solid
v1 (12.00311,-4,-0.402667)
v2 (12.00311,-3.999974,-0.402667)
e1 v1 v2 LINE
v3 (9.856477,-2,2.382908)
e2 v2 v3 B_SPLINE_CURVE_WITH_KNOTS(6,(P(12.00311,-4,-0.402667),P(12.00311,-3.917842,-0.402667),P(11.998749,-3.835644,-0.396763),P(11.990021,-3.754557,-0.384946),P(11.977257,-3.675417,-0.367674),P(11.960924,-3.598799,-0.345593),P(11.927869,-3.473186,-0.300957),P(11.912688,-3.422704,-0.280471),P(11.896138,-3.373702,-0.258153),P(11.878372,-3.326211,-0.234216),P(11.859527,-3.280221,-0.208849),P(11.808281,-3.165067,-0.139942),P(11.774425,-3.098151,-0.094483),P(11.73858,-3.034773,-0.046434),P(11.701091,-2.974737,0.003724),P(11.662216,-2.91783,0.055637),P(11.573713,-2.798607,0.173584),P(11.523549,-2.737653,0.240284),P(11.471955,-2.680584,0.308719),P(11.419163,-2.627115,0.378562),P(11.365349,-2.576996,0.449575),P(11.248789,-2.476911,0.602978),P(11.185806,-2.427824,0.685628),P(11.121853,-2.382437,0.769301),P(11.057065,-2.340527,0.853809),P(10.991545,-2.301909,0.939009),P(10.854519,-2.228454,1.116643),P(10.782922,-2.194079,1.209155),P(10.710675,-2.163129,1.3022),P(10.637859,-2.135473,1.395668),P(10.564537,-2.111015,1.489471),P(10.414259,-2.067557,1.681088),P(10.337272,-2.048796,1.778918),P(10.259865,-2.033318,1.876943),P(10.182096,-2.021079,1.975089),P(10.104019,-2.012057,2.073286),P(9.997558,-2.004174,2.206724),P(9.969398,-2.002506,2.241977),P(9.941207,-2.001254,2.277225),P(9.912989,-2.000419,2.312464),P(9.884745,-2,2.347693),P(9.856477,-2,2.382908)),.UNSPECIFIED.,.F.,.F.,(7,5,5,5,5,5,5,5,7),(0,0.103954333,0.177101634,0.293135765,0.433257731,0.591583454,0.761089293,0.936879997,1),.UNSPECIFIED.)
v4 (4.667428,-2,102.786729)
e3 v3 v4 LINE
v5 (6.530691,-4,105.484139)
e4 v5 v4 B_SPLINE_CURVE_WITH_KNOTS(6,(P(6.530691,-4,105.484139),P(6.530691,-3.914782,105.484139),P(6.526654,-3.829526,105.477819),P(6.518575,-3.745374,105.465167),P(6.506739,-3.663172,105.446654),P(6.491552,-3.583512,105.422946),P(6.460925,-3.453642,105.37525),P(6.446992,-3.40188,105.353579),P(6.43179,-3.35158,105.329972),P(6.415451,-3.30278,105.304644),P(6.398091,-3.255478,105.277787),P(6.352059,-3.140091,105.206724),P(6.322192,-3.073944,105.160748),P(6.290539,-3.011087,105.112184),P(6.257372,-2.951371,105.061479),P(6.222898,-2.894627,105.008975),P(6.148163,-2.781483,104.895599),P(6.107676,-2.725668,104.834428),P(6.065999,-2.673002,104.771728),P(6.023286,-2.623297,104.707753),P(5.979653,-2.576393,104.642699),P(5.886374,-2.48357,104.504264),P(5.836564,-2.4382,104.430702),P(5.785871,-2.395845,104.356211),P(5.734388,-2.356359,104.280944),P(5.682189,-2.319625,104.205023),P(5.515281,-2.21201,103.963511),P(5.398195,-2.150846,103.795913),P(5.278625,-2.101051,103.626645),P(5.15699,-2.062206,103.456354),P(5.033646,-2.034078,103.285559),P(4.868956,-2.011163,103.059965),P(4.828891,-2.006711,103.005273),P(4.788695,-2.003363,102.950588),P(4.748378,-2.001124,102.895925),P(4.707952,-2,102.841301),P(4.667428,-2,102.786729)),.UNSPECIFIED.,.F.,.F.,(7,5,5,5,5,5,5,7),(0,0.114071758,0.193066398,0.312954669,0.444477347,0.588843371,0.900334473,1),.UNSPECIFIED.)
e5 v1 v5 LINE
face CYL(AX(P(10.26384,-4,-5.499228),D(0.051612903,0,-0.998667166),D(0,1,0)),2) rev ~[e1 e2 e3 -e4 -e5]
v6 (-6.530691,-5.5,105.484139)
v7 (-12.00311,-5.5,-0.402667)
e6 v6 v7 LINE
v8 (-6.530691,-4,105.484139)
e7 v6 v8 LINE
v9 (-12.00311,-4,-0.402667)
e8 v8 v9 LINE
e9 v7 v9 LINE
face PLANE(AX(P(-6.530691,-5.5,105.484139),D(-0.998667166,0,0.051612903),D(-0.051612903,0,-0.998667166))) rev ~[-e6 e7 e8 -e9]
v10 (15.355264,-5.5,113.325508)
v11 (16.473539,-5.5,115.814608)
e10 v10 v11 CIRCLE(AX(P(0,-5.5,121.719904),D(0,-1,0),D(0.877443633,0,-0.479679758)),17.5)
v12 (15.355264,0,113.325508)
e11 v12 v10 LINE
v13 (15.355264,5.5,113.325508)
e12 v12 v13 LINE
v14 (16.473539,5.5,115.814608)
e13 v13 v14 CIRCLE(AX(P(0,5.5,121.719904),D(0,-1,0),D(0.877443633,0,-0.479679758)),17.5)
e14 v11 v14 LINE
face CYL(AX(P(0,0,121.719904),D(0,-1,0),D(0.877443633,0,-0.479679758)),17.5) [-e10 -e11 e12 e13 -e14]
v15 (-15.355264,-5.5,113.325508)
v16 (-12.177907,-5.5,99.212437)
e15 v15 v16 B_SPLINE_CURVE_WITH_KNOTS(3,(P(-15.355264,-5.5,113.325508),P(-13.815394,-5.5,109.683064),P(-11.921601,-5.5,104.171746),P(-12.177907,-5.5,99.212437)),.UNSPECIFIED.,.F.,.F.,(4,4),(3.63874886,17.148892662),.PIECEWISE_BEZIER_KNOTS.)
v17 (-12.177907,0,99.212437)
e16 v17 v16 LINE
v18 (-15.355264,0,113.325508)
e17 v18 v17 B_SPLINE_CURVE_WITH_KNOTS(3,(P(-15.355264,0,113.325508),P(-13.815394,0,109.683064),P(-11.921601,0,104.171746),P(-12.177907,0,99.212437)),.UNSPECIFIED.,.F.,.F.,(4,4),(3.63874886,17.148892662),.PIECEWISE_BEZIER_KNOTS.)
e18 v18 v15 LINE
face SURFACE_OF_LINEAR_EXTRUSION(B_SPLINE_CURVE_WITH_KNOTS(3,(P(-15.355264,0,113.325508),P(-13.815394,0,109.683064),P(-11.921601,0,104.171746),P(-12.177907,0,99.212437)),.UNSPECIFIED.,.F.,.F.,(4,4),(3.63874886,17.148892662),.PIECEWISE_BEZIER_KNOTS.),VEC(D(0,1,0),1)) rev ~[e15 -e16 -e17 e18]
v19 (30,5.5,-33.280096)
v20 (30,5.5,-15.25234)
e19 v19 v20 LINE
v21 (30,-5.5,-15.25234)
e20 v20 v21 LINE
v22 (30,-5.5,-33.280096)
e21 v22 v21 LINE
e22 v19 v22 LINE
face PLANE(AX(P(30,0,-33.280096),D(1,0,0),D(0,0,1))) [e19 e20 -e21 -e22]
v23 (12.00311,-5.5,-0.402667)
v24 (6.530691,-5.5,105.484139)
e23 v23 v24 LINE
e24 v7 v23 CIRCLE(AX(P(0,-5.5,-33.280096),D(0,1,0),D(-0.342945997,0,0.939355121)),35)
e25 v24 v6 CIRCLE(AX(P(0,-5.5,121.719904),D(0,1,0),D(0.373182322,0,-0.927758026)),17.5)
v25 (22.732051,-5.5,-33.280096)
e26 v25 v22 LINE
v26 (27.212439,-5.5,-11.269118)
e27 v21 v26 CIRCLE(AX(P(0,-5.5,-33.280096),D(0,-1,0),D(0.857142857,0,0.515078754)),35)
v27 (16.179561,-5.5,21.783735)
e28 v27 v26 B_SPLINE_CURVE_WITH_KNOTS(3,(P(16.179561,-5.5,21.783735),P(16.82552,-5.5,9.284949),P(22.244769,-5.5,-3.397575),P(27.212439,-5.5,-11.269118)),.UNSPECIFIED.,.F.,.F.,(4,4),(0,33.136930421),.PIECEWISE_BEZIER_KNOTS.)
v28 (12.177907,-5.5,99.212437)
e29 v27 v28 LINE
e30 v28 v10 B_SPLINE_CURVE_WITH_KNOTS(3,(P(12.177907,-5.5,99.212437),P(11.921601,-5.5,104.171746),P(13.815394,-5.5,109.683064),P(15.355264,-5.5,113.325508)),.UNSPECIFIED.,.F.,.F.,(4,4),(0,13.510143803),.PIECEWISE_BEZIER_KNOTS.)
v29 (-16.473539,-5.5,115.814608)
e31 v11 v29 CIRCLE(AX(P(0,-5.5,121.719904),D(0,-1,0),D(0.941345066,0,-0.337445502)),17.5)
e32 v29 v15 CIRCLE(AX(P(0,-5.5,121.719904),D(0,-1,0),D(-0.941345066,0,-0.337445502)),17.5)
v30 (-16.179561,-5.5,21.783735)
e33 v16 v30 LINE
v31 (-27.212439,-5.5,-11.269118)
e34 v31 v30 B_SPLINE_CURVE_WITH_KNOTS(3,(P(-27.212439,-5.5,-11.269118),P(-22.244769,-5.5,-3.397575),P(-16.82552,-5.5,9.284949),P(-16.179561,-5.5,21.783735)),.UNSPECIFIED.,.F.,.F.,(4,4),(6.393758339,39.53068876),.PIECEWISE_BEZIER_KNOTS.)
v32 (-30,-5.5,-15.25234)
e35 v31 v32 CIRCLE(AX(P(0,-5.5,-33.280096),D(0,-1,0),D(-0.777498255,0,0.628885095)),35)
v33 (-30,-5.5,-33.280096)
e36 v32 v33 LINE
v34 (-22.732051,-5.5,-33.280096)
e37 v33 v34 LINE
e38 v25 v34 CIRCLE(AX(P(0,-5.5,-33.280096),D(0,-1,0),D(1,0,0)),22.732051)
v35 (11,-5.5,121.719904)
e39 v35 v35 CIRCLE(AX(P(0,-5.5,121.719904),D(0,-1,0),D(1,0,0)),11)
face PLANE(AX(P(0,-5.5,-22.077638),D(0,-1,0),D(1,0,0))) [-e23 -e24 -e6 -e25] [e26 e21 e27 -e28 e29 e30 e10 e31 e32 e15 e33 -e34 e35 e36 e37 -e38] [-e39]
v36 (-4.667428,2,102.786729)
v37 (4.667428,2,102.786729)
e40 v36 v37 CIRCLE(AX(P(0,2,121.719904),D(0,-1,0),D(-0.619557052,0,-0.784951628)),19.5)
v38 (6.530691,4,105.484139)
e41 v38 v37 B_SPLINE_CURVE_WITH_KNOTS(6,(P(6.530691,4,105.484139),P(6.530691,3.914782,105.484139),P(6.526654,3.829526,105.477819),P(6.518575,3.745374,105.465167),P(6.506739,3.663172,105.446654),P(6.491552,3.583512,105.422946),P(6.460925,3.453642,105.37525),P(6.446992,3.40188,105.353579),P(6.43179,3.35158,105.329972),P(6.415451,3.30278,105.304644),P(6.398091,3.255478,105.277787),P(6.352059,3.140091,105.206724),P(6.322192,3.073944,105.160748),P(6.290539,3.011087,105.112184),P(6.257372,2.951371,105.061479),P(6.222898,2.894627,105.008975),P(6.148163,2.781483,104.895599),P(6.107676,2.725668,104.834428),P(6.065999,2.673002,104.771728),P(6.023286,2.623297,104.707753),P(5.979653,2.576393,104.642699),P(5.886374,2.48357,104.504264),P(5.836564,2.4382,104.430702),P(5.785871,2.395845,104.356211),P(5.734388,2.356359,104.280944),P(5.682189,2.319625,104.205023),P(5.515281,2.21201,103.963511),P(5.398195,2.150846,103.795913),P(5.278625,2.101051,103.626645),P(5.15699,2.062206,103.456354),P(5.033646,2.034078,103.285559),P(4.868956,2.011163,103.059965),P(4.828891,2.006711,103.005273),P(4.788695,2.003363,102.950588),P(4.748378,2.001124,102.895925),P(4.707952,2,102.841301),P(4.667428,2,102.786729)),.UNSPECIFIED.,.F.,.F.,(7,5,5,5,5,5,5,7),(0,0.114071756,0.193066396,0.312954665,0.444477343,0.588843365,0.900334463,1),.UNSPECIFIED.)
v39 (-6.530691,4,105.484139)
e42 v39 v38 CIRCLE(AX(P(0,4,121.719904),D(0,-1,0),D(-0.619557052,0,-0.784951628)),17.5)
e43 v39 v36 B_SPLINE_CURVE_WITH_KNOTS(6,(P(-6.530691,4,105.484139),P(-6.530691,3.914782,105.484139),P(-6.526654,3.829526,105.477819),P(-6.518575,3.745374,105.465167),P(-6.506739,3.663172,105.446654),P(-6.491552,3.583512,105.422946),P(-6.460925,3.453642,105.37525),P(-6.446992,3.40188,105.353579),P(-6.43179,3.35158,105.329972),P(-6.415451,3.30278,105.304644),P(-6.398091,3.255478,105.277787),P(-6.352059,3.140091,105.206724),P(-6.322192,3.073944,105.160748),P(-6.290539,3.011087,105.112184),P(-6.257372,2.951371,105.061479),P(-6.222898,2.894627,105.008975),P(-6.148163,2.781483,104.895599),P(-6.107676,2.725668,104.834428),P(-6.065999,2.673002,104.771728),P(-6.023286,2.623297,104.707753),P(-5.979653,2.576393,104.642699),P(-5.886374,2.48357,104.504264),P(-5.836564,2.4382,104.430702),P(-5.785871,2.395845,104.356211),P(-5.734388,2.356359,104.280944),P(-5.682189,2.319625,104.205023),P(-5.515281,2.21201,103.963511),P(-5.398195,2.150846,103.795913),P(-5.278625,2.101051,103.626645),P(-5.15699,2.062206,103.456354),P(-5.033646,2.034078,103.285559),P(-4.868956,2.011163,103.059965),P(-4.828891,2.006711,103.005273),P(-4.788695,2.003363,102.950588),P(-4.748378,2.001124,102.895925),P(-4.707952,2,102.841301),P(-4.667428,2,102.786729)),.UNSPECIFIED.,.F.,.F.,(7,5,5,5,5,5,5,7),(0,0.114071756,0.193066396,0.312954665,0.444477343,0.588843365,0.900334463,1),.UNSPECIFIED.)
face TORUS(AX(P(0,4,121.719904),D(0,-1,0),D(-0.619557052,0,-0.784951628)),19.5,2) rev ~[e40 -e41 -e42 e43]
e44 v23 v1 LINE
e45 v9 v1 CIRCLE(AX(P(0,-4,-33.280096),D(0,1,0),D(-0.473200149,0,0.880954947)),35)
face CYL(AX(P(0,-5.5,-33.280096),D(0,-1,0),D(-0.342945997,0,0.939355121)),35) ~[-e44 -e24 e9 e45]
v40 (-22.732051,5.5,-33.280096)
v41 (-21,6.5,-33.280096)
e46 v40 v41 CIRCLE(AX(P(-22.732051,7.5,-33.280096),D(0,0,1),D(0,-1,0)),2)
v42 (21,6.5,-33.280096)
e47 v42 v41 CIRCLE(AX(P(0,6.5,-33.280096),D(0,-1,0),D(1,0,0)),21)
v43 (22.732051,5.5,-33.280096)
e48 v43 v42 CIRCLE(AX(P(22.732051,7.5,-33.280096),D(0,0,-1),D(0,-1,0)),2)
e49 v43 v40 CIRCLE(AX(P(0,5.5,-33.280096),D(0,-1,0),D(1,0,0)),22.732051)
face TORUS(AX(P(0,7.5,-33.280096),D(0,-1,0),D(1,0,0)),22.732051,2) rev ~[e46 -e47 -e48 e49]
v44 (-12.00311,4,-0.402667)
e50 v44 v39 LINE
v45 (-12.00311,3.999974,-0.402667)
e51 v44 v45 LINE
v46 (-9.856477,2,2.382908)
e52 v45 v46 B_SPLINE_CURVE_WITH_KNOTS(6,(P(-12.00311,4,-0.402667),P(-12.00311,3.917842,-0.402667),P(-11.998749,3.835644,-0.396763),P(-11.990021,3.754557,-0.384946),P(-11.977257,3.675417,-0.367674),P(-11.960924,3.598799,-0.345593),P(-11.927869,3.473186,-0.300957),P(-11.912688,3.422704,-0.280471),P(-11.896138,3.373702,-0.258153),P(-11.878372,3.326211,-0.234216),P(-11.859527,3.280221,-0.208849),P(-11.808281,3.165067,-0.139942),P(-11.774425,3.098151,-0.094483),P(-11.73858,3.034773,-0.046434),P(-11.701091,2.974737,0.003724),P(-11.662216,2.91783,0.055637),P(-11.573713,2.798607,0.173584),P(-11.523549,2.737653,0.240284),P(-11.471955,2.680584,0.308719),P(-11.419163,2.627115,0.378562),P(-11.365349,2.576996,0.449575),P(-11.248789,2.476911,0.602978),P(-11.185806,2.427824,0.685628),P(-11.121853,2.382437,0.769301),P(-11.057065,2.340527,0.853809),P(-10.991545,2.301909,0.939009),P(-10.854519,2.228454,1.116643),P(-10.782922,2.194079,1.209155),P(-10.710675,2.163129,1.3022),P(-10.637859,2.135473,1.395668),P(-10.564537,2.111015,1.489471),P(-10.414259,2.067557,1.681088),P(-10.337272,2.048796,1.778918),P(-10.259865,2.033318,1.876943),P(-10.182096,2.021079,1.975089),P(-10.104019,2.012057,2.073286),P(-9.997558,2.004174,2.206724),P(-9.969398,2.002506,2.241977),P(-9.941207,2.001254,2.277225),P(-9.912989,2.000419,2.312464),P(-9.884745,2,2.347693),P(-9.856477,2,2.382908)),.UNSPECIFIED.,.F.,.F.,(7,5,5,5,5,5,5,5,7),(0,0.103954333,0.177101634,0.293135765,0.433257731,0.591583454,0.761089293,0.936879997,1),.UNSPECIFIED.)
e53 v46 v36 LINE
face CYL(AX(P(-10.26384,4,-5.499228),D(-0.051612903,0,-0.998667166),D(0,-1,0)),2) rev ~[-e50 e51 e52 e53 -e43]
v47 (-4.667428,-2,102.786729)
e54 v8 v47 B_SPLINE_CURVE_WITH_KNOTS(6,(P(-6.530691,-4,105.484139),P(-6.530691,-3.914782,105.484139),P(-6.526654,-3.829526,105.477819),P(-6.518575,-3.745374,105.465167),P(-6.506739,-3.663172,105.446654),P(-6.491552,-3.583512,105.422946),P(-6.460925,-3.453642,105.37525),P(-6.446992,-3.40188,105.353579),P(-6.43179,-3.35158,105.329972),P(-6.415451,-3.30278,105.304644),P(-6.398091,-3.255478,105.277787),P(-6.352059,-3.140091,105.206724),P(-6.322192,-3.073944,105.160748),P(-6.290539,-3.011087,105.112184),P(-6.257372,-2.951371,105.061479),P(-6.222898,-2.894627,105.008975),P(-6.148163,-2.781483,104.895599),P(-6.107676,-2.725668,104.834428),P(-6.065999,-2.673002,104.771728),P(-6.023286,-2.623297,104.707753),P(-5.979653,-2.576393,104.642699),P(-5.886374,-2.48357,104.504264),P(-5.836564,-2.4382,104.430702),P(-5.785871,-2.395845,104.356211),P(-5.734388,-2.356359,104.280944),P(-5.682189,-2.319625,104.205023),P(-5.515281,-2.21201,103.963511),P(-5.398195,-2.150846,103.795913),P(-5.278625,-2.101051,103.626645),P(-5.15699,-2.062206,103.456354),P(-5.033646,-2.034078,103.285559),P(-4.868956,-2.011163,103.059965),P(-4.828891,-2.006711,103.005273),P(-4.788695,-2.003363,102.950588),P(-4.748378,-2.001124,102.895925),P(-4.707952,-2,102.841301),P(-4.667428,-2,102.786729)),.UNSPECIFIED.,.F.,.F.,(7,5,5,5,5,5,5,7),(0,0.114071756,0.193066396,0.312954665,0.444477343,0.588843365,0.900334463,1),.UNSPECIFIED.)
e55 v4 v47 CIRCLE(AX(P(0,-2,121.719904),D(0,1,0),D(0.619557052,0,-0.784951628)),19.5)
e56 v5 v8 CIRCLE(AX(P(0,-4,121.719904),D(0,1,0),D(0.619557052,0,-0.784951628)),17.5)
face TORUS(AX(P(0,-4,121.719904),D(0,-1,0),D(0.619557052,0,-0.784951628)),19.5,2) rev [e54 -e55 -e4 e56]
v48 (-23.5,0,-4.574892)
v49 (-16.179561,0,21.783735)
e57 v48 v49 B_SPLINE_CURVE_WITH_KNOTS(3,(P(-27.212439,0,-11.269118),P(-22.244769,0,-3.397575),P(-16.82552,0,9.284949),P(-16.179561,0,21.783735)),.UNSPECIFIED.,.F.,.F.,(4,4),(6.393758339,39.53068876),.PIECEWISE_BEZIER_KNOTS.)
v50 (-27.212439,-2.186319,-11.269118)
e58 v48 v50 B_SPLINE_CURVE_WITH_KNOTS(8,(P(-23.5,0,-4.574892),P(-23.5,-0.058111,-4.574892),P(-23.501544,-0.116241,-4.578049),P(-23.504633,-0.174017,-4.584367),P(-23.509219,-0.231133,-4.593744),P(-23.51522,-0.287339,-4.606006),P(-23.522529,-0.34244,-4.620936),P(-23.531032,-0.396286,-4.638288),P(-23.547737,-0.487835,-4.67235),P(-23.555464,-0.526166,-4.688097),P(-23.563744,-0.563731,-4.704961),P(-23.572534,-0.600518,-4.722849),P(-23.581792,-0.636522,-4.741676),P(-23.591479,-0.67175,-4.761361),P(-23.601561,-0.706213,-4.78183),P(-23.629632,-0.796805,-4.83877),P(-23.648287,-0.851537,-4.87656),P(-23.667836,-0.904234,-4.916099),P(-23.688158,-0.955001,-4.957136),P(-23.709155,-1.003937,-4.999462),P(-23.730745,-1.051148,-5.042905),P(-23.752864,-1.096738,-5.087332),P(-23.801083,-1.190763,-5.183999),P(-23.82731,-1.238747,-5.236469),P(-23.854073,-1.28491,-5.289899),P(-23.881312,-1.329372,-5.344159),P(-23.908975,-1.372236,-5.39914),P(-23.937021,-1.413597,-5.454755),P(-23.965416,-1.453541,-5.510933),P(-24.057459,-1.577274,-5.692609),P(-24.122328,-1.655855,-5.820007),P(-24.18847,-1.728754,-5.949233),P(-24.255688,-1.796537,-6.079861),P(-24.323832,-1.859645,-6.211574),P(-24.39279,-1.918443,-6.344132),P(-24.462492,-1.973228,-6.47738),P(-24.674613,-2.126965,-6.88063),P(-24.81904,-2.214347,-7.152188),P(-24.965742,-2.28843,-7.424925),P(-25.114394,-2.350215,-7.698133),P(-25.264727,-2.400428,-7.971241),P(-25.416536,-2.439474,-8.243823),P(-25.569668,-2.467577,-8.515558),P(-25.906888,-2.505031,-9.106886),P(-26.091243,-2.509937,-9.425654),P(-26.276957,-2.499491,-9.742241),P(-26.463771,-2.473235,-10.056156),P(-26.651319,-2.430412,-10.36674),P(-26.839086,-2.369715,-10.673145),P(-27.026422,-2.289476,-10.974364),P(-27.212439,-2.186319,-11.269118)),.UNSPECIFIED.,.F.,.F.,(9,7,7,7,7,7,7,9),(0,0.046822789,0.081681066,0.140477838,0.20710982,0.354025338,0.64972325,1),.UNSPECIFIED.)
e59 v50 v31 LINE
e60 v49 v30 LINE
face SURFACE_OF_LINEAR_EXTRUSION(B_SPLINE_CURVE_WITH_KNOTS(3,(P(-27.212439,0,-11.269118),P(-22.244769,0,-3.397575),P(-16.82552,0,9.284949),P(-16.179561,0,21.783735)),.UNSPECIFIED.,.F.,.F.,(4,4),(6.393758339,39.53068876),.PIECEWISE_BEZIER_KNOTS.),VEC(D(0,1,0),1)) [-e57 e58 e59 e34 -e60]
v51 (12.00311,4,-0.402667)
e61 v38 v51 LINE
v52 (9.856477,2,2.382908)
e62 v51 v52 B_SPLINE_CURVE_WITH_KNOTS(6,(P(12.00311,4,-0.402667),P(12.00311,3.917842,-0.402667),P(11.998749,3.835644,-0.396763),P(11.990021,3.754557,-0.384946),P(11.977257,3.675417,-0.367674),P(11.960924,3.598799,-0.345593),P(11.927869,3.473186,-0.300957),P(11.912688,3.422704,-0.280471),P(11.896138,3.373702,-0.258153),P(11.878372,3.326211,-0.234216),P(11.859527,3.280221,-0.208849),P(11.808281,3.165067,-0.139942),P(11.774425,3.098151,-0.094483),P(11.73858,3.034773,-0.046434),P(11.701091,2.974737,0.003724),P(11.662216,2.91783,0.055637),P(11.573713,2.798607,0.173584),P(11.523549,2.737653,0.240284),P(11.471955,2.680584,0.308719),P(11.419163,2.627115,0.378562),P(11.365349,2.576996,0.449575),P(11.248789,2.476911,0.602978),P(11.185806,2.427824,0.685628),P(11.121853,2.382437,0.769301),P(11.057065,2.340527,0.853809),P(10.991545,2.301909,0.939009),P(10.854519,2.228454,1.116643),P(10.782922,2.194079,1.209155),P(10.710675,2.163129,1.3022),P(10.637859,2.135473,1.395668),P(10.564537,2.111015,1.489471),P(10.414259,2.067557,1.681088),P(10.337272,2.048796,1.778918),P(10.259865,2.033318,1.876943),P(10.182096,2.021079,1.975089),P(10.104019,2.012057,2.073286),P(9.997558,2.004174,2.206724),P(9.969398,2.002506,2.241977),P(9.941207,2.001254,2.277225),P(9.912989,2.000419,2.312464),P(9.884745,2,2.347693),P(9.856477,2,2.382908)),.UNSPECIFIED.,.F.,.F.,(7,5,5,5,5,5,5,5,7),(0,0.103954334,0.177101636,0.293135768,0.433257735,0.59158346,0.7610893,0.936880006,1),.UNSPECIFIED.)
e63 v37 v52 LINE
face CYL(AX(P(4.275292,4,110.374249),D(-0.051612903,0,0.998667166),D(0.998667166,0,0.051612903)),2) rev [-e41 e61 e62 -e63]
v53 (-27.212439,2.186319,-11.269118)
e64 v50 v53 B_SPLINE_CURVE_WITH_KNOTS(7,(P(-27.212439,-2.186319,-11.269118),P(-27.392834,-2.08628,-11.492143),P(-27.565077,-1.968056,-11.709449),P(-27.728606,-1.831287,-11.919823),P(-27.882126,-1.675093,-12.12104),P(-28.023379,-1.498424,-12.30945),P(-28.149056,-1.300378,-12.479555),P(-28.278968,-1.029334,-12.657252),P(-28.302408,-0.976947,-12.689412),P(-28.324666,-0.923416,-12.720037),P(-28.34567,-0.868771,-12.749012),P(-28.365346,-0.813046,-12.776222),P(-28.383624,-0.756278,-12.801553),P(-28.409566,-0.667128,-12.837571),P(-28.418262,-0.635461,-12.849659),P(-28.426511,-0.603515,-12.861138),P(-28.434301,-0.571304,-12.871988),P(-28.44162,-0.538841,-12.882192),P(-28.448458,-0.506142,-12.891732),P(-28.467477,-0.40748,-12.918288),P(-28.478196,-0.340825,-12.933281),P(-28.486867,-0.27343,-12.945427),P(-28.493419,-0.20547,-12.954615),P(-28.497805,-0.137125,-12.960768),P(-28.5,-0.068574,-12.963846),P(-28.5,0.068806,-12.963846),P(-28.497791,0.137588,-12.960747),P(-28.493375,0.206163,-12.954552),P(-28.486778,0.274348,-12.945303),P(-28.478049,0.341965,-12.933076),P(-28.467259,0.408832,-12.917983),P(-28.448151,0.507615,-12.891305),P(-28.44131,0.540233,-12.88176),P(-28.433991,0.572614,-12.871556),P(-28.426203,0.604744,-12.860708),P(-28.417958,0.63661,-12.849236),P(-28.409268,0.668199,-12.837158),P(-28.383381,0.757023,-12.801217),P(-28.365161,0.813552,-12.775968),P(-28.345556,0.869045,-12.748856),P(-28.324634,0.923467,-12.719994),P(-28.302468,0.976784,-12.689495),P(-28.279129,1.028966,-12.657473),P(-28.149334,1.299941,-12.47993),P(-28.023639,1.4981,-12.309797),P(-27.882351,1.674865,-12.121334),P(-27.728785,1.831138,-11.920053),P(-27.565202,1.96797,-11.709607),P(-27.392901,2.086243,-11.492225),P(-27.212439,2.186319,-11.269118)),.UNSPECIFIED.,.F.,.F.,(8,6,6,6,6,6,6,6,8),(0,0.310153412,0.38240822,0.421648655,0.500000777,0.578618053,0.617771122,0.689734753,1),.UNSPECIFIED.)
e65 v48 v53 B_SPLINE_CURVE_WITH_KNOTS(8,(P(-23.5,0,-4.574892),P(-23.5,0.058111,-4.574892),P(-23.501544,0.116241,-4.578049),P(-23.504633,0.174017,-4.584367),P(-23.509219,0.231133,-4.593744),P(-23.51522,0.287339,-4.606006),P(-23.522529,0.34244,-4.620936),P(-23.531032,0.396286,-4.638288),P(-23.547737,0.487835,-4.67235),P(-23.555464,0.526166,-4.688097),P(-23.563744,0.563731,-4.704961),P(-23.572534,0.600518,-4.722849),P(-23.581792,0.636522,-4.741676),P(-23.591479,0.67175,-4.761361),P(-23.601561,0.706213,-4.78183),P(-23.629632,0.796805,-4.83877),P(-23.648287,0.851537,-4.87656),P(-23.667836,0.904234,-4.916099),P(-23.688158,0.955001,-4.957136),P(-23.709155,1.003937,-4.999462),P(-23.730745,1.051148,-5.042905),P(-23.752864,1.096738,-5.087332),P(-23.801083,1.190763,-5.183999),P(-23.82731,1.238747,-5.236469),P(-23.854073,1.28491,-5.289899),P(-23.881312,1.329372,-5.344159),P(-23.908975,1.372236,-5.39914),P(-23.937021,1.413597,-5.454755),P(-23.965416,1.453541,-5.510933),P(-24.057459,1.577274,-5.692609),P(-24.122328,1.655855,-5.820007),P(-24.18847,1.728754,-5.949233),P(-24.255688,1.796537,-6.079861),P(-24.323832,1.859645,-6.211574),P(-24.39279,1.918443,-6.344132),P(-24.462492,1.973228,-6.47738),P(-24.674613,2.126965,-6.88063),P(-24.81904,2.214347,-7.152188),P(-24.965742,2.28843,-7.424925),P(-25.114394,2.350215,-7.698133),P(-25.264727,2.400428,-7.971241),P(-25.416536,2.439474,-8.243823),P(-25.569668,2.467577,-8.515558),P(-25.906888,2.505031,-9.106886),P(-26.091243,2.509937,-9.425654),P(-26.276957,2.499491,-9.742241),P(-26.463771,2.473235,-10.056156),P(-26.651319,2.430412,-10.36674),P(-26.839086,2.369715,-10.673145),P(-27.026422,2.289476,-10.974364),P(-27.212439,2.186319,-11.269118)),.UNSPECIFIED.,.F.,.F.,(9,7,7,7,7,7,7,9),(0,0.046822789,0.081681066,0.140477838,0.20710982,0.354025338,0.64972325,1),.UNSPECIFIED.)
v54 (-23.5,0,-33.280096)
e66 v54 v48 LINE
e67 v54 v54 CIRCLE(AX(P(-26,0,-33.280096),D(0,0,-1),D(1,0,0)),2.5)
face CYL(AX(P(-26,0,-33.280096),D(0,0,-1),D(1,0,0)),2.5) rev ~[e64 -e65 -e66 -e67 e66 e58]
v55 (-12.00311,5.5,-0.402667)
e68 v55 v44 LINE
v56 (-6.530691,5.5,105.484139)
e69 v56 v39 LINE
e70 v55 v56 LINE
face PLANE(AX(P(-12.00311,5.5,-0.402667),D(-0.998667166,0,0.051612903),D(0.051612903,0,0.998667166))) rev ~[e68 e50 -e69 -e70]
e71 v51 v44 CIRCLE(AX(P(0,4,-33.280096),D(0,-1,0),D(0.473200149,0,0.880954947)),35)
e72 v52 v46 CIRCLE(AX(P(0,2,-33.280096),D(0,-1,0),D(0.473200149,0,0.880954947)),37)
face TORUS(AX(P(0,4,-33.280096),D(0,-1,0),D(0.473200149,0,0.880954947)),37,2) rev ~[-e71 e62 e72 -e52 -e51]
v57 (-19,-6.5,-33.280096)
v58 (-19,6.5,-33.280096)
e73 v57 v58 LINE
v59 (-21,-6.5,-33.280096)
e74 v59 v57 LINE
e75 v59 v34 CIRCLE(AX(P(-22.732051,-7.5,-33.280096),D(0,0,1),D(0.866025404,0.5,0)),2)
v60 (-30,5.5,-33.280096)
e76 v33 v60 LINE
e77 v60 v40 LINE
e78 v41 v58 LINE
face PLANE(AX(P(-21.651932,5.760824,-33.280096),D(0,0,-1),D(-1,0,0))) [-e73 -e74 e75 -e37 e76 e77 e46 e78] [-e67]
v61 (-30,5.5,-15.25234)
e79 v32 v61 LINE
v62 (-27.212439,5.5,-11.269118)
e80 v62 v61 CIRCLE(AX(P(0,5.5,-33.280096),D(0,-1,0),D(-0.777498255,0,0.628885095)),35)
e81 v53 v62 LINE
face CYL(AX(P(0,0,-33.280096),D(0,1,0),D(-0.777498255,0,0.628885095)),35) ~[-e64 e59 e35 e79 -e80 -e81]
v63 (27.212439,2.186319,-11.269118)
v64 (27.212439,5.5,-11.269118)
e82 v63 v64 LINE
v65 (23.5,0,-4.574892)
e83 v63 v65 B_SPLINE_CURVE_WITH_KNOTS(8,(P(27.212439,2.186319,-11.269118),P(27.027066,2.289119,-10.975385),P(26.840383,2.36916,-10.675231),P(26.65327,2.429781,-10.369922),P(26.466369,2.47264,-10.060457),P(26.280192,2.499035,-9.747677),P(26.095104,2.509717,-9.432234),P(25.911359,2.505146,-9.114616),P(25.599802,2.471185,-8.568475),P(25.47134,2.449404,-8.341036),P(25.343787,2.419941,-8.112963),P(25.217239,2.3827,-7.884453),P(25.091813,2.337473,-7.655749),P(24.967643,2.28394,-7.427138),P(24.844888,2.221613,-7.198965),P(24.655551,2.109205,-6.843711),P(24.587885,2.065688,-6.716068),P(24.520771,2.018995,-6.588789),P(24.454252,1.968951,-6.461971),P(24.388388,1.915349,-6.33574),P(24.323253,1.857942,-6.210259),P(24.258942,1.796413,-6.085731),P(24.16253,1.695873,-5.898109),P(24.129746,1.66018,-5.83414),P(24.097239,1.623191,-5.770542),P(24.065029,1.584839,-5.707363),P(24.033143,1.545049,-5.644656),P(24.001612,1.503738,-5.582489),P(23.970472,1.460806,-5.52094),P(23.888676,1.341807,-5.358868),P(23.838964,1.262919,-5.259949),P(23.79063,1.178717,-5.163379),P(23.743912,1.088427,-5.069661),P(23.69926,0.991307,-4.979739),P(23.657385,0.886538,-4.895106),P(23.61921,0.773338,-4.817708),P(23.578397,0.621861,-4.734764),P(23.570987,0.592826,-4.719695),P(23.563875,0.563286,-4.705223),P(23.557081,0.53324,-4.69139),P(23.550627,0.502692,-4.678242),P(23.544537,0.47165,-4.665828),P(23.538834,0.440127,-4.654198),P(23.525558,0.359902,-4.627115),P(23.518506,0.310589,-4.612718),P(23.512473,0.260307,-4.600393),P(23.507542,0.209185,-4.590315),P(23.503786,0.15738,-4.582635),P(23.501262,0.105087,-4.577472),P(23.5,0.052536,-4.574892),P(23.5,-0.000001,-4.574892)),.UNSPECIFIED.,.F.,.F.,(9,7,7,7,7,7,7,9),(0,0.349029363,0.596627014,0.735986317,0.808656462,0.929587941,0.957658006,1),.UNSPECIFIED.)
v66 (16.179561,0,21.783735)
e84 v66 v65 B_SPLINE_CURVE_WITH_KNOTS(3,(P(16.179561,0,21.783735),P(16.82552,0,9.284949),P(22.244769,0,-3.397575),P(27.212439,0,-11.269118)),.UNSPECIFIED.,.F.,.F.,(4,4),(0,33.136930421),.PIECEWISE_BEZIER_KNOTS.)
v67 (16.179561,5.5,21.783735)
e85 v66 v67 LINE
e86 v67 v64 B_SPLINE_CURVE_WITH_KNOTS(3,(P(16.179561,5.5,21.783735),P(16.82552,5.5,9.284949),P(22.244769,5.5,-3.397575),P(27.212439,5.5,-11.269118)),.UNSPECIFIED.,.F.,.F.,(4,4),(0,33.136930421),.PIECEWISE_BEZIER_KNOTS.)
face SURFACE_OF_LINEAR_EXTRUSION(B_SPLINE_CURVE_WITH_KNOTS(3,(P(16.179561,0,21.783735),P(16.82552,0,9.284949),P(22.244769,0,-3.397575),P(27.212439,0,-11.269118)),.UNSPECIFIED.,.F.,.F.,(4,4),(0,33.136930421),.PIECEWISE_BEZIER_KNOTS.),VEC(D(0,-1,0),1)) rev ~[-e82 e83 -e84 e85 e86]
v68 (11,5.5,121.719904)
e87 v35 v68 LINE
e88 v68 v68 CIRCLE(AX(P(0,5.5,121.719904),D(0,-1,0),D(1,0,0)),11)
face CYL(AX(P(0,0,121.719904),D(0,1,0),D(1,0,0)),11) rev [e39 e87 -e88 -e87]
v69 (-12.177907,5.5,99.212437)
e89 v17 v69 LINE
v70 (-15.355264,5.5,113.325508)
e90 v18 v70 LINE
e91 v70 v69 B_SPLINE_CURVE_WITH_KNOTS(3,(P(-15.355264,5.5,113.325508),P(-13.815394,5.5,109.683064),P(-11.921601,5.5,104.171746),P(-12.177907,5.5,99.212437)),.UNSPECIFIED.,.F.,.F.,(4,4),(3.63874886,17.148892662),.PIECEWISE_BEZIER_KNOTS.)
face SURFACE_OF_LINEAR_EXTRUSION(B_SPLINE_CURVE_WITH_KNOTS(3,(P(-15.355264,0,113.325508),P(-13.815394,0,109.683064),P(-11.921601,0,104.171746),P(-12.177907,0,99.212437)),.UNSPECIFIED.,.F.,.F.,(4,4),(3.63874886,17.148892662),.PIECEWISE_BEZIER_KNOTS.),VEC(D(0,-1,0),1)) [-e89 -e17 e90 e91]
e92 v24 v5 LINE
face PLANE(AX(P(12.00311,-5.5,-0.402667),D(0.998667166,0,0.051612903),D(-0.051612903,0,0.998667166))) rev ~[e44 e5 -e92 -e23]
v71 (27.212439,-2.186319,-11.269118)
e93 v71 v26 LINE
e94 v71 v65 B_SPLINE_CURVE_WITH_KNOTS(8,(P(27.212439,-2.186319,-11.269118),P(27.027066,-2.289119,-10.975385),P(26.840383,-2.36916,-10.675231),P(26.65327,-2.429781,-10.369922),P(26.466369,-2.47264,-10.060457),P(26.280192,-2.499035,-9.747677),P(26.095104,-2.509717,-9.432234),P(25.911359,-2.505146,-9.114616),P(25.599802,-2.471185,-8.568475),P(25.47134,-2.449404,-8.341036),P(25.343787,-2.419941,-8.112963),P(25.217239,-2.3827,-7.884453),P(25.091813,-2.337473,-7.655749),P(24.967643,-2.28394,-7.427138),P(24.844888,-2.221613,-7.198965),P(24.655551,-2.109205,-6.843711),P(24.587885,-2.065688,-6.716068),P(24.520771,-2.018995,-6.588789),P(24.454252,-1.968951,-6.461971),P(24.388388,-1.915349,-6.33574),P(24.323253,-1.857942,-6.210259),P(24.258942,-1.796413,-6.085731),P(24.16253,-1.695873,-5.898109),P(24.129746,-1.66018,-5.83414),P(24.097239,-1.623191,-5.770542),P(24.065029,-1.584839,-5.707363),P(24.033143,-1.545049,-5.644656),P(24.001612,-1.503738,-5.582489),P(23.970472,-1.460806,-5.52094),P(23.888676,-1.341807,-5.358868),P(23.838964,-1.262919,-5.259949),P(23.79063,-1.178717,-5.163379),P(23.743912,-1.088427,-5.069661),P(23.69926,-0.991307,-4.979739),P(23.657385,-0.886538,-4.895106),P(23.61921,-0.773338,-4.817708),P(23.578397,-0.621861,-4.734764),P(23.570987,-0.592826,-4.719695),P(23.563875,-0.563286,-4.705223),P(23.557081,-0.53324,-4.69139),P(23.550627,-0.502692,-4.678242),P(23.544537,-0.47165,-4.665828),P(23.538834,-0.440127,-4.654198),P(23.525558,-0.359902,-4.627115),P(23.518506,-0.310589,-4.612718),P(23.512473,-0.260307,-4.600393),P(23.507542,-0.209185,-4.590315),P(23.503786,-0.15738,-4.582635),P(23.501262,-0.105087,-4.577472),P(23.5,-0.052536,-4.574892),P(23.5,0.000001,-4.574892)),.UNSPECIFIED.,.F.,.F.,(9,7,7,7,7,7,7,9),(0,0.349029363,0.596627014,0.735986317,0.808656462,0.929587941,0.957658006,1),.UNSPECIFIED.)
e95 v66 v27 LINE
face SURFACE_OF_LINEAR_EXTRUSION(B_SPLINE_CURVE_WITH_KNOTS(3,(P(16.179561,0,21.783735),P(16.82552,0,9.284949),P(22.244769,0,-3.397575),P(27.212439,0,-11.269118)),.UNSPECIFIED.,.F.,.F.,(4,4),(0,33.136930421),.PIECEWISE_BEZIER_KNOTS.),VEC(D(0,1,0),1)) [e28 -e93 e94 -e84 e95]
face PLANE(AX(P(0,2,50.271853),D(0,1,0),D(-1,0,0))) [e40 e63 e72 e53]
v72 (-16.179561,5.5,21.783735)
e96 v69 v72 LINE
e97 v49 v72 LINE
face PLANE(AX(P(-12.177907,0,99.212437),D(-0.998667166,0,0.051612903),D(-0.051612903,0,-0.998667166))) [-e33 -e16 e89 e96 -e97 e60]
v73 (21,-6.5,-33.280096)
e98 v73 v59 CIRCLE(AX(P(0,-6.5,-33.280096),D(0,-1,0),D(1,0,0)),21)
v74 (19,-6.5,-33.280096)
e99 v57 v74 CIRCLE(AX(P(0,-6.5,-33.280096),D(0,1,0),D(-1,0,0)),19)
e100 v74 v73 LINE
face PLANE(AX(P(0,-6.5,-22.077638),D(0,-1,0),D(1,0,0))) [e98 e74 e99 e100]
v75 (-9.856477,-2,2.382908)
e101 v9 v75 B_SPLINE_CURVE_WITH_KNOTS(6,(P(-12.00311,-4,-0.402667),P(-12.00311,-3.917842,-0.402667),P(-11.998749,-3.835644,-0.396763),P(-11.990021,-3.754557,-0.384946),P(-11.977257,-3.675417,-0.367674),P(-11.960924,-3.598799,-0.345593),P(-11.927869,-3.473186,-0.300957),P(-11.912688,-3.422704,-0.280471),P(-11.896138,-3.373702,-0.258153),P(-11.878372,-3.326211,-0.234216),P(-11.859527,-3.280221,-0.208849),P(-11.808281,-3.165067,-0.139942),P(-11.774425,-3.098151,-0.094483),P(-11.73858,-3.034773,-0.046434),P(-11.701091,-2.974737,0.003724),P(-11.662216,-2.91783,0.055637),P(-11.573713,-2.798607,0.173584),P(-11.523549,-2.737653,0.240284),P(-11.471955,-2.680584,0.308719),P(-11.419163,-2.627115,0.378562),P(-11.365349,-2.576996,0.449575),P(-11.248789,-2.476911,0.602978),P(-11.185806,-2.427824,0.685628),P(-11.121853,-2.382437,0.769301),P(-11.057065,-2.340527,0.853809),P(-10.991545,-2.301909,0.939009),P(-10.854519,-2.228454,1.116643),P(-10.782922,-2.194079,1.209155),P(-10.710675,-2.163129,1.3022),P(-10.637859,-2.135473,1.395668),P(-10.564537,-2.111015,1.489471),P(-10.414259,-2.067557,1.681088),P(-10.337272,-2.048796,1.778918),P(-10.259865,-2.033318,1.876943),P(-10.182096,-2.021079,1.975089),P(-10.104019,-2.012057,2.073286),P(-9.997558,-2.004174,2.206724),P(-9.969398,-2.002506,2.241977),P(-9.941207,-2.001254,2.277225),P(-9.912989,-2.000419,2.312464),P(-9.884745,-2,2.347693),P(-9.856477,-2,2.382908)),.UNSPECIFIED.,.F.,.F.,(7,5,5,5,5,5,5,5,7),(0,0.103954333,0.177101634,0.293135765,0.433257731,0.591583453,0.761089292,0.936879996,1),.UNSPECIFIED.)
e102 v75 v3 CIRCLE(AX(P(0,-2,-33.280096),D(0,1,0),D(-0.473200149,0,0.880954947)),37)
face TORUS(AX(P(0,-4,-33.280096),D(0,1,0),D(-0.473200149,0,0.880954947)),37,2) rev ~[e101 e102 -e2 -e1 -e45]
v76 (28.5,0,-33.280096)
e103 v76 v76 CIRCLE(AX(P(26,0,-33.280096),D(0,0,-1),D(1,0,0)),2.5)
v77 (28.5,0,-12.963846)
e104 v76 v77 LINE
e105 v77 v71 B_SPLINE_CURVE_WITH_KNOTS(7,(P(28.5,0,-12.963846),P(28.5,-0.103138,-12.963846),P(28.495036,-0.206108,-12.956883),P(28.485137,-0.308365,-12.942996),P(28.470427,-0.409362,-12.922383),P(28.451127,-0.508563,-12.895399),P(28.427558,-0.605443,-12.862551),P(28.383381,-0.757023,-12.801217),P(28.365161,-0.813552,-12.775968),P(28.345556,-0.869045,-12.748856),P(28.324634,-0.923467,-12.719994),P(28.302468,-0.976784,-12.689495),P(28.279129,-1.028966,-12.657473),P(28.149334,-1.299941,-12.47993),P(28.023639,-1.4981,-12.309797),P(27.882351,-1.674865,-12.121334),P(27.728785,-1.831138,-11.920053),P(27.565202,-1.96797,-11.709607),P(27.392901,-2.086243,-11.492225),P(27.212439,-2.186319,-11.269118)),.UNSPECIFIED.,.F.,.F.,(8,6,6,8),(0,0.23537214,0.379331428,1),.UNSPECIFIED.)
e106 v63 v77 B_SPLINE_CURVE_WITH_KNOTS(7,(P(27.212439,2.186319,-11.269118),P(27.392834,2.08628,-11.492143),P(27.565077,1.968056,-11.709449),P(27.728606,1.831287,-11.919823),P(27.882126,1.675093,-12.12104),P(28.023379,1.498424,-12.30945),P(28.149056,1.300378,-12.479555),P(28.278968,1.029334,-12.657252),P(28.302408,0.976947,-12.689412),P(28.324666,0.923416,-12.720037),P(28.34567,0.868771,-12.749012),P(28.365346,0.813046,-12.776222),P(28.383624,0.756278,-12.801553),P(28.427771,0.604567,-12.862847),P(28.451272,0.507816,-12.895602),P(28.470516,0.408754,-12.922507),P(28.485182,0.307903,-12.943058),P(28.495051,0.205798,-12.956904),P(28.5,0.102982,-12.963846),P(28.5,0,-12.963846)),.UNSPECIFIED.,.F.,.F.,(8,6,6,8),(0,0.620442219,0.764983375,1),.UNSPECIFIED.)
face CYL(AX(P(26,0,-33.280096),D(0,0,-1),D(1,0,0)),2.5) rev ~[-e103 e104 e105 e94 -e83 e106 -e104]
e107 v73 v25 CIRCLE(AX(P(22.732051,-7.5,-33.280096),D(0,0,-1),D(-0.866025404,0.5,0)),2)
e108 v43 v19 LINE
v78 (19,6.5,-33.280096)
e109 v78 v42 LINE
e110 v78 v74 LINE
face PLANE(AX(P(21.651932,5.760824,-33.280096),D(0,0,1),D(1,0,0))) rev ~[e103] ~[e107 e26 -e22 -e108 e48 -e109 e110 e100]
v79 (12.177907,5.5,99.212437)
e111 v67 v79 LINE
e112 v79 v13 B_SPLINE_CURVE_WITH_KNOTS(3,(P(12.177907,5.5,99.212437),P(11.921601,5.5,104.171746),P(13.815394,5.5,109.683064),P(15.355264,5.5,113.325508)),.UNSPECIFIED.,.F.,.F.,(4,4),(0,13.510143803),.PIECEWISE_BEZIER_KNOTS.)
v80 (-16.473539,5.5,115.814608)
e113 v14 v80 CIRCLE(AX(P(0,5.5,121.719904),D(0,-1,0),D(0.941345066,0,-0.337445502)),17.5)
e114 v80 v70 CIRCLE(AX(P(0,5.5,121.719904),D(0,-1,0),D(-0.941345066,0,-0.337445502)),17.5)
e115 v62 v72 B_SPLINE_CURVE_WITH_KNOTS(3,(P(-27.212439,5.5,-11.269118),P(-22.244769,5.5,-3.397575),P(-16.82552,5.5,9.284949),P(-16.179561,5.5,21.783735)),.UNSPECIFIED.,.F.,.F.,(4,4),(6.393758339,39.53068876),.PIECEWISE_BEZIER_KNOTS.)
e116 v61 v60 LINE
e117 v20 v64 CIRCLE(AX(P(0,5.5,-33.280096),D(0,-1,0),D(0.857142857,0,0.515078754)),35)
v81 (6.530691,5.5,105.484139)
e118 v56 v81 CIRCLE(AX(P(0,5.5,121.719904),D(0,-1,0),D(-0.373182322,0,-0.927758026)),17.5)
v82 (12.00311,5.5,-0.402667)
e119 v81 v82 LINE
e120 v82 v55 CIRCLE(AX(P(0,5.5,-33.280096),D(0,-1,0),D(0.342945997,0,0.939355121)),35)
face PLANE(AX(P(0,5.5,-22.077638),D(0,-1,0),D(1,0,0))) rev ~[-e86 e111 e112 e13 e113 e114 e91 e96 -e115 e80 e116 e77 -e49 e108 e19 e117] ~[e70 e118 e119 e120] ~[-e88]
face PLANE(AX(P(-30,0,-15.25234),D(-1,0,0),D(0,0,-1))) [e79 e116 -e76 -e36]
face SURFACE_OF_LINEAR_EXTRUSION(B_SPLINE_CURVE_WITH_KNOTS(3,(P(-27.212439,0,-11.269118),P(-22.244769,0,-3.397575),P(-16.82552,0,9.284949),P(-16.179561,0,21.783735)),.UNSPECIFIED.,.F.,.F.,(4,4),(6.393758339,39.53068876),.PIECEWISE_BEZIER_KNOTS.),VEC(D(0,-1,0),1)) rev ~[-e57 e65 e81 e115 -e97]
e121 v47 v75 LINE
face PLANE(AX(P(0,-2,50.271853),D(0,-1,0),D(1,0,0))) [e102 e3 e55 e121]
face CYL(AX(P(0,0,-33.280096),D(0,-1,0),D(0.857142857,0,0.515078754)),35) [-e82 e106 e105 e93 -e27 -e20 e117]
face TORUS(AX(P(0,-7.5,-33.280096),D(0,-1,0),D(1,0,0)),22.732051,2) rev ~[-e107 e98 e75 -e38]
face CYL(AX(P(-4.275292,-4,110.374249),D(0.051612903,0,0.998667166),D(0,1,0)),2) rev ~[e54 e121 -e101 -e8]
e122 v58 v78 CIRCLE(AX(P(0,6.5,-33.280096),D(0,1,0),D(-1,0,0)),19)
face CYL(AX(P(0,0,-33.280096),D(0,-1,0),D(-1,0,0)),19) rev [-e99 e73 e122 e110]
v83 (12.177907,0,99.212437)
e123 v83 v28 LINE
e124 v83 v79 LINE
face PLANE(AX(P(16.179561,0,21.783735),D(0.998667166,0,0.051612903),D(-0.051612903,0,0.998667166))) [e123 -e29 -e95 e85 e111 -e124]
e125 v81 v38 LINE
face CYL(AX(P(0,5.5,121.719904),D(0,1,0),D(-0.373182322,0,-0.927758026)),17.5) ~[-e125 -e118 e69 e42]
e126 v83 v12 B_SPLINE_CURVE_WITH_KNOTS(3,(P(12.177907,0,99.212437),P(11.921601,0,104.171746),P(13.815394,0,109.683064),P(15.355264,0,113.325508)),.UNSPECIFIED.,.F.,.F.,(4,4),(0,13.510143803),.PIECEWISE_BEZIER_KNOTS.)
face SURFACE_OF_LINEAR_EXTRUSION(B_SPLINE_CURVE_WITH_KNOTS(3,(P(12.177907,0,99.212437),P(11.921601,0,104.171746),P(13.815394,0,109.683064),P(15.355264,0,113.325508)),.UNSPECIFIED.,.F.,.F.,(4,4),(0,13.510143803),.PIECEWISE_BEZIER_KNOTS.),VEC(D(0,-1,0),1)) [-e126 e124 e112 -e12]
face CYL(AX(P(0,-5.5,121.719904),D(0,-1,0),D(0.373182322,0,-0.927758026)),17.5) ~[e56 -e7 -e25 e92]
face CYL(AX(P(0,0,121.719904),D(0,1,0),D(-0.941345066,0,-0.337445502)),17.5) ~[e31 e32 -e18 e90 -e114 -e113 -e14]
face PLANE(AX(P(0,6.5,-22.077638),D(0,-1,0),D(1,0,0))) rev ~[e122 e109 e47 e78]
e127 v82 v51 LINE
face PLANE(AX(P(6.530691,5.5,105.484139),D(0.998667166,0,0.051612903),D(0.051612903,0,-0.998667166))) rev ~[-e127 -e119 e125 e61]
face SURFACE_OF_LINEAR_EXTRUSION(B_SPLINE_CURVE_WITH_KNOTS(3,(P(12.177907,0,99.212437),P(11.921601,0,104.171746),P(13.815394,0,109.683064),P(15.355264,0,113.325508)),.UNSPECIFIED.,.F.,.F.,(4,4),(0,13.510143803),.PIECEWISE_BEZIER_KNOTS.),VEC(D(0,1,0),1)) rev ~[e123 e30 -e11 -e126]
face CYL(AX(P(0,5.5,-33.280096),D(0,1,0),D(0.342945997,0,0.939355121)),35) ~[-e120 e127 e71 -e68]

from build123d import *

# Parameters (mm, degrees)
F0_R         = 11
F1_DEPTH     = 5.5
F3_DEPTH     = 3.5
F5_DEPTH     = 3.5
F6_R         = 2.5
F7_DEPTH     = 42.164
F8_DEPTH     = 6.5
F9_T1_DEPTH  = 116.0281232172
F9_T3_DEPTH  = 116.0281232172
F9_T5_DEPTH  = 116.0281232172
F9_T7_DEPTH  = 116.0281232172
F9_T10_ANGLE = 180
F9_T12_ANGLE = 180
F9_T14_ANGLE = 56.4844529803
F9_T16_ANGLE = 76.5675906158
F9_T18_ANGLE = 76.5675906158
F9_T20_ANGLE = 56.4844529803


# Not quite as in the source:
# - a fillet or chamfer that OpenCascade refuses, or shapes differently, is made with other operations: its cross-section is extruded or revolved along the edge and cut away or added


with BuildPart() as f1:
    # F0 (on Front) → F1 (new body, symmetric)
    with BuildSketch(Plane.XZ):
        with BuildLine():
            ThreePointArc((-19, -33.2800959392), (0, -14.2800959392), (19, -33.2800959392))
            Line((19, -33.2800959392), (21, -33.2800959392))
            ThreePointArc((21, -33.2800959392), (0, -12.2800959392), (-21, -33.2800959392))
            Line((-21, -33.2800959392), (-19, -33.2800959392))
        make_face()
        with BuildLine():
            ThreePointArc((-21, -33.2800959392), (0, -12.2800959392), (21, -33.2800959392))
            Line((21, -33.2800959392), (30, -33.2800959392))
            Line((30, -33.2800959392), (30, -15.2523395618))
            add(Edge.make_bspline(
                [(27.2124389343, -11.2691176046), (28.1709489037, -12.7879287388), (29.112646753, -14.1276291325), (30, -15.2523395618)],
                knots=[33.1369304212, 33.1369304212, 33.1369304212, 33.1369304212, 39.5306887603, 39.5306887603, 39.5306887603, 39.5306887603], degree=3))
            ThreePointArc((27.2124389343, -11.2691176046), (22.7195127023, -6.6563519768), (17.4575728273, -2.9447510263))
            Line((17.4575728273, -2.9447510263), (16.1795605017, 21.7837348243))
            Line((16.1795605017, 21.7837348243), (12.1779068373, 99.2124372244))
            Line((12.1779068373, 99.2124372244), (11.6878243777, 108.6951291562))
            ThreePointArc((11.6878243777, 108.6951291562), (13.7183182045, 110.8544659363), (15.3552635835, 113.3255082945))
            add(Edge.make_bspline(
                [(15.3552635835, 113.3255082945), (15.770003684, 114.3065445088), (16.1590697648, 115.1520105897), (16.4735386522, 115.8146077708)],
                knots=[13.5101438027, 13.5101438027, 13.5101438027, 13.5101438027, 17.1488926622, 17.1488926622, 17.1488926622, 17.1488926622], degree=3))
            ThreePointArc((16.4735386522, 115.8146077708), (0, 139.2199040608), (-16.4735386522, 115.8146077708))
            add(Edge.make_bspline(
                [(-16.4735386522, 115.8146077708), (-16.1590697648, 115.1520105897), (-15.770003684, 114.3065445088), (-15.3552635835, 113.3255082945)],
                knots=[0, 0, 0, 0, 3.6387488595, 3.6387488595, 3.6387488595, 3.6387488595], degree=3))
            ThreePointArc((-15.3552635835, 113.3255082945), (-13.7183182045, 110.8544659363), (-11.6878243777, 108.6951291562))
            Line((-11.6878243777, 108.6951291562), (-12.1779068373, 99.2124372244))
            Line((-12.1779068373, 99.2124372244), (-16.1795605017, 21.7837348243))
            Line((-16.1795605017, 21.7837348243), (-17.4575728273, -2.9447510263))
            ThreePointArc((-17.4575728273, -2.9447510263), (-22.7195127023, -6.6563519768), (-27.2124389343, -11.2691176046))
            add(Edge.make_bspline(
                [(-30, -15.2523395618), (-29.112646753, -14.1276291325), (-28.1709489037, -12.7879287388), (-27.2124389343, -11.2691176046)],
                knots=[0, 0, 0, 0, 6.3937583391, 6.3937583391, 6.3937583391, 6.3937583391], degree=3))
            Line((-30, -15.2523395618), (-30, -33.2800959392))
            Line((-30, -33.2800959392), (-21, -33.2800959392))
        make_face()
        with Locations((0, 121.7199040608)):
            Circle(F0_R, mode=Mode.SUBTRACT)
        with BuildLine():
            add(Edge.make_bspline(
                [(27.2124389343, -11.2691176046), (28.1709489037, -12.7879287388), (29.112646753, -14.1276291325), (30, -15.2523395618)],
                knots=[33.1369304212, 33.1369304212, 33.1369304212, 33.1369304212, 39.5306887603, 39.5306887603, 39.5306887603, 39.5306887603], degree=3))
            ThreePointArc((30, -15.2523395618), (28.6754652359, -13.2122686152), (27.2124389343, -11.2691176046))
        make_face()
        with BuildLine():
            ThreePointArc((-27.2124389343, -11.2691176046), (-28.6754652359, -13.2122686152), (-30, -15.2523395618))
            add(Edge.make_bspline(
                [(-30, -15.2523395618), (-29.112646753, -14.1276291325), (-28.1709489037, -12.7879287388), (-27.2124389343, -11.2691176046)],
                knots=[0, 0, 0, 0, 6.3937583391, 6.3937583391, 6.3937583391, 6.3937583391], degree=3))
        make_face()
        with BuildLine():
            ThreePointArc((17.4575728273, -2.9447510263), (22.7195127023, -6.6563519768), (27.2124389343, -11.2691176046))
            add(Edge.make_bspline(
                [(16.1795605017, 21.7837348243), (16.8255200796, 9.2849490449), (22.2447694546, -3.3975753584), (27.2124389343, -11.2691176046)],
                knots=[0, 0, 0, 0, 33.1369304212, 33.1369304212, 33.1369304212, 33.1369304212], degree=3))
            Line((16.1795605017, 21.7837348243), (17.4575728273, -2.9447510263))
        make_face()
        with BuildLine():
            add(Edge.make_bspline(
                [(-27.2124389343, -11.2691176046), (-22.2447694546, -3.3975753584), (-16.8255200796, 9.2849490449), (-16.1795605017, 21.7837348243)],
                knots=[6.3937583391, 6.3937583391, 6.3937583391, 6.3937583391, 39.5306887603, 39.5306887603, 39.5306887603, 39.5306887603], degree=3))
            ThreePointArc((-27.2124389343, -11.2691176046), (-22.7195127023, -6.6563519768), (-17.4575728273, -2.9447510263))
            Line((-17.4575728273, -2.9447510263), (-16.1795605017, 21.7837348243))
        make_face()
        with BuildLine():
            Line((11.6878243777, 108.6951291562), (12.1779068373, 99.2124372244))
            add(Edge.make_bspline(
                [(12.1779068373, 99.2124372244), (11.9216008752, 104.1717464831), (13.8153940804, 109.6830639154), (15.3552635835, 113.3255082945)],
                knots=[0, 0, 0, 0, 13.5101438027, 13.5101438027, 13.5101438027, 13.5101438027], degree=3))
            ThreePointArc((15.3552635835, 113.3255082945), (13.7183182045, 110.8544659363), (11.6878243777, 108.6951291562))
        make_face()
        with BuildLine():
            add(Edge.make_bspline(
                [(-15.3552635835, 113.3255082945), (-13.8153940804, 109.6830639154), (-11.9216008752, 104.1717464831), (-12.1779068373, 99.2124372244)],
                knots=[3.6387488595, 3.6387488595, 3.6387488595, 3.6387488595, 17.1488926622, 17.1488926622, 17.1488926622, 17.1488926622], degree=3))
            Line((-12.1779068373, 99.2124372244), (-11.6878243777, 108.6951291562))
            ThreePointArc((-11.6878243777, 108.6951291562), (-13.7183182045, 110.8544659363), (-15.3552635835, 113.3255082945))
        make_face()
        with BuildLine():
            add(Edge.make_bspline(
                [(15.3552635835, 113.3255082945), (15.770003684, 114.3065445088), (16.1590697648, 115.1520105897), (16.4735386522, 115.8146077708)],
                knots=[13.5101438027, 13.5101438027, 13.5101438027, 13.5101438027, 17.1488926622, 17.1488926622, 17.1488926622, 17.1488926622], degree=3))
            ThreePointArc((15.3552635835, 113.3255082945), (15.9629905403, 114.5482283146), (16.4735386522, 115.8146077708))
        make_face()
        with BuildLine():
            ThreePointArc((-16.4735386522, 115.8146077708), (-15.9629905403, 114.5482283146), (-15.3552635835, 113.3255082945))
            add(Edge.make_bspline(
                [(-16.4735386522, 115.8146077708), (-16.1590697648, 115.1520105897), (-15.770003684, 114.3065445088), (-15.3552635835, 113.3255082945)],
                knots=[0, 0, 0, 0, 3.6387488595, 3.6387488595, 3.6387488595, 3.6387488595], degree=3))
        make_face()
    extrude(amount=F1_DEPTH, both=True)

    # F2 (on face) → F3 (cut)
    with BuildSketch(Plane.XZ.offset(5.5)):
        with BuildLine():
            ThreePointArc((6.5306906354, 105.4841386084), (0, 104.2199040608), (-6.5306906354, 105.4841386084))
            Line((-6.5306906354, 105.4841386084), (-12.0031098982, -0.4026667092))
            ThreePointArc((-12.0031098982, -0.4026667092), (0, 1.7199040608), (12.0031098982, -0.4026667092))
            Line((12.0031098982, -0.4026667092), (6.5306906354, 105.4841386084))
        make_face()
    extrude(amount=-F3_DEPTH, mode=Mode.SUBTRACT)

    # F4 (on face) → F5 (cut)
    with BuildSketch(Plane(origin=(0, 5.5, 0), x_dir=(-1, 0, 0), z_dir=(0, 1, 0))):
        with BuildLine():
            ThreePointArc((6.5306906354, 105.4841386084), (0, 104.2199040608), (-6.5306906354, 105.4841386084))
            Line((-6.5306906354, 105.4841386084), (-12.0031098982, -0.4026667092))
            ThreePointArc((-12.0031098982, -0.4026667092), (0, 1.7199040608), (12.0031098982, -0.4026667092))
            Line((12.0031098982, -0.4026667092), (6.5306906354, 105.4841386084))
        make_face()
    extrude(amount=-F5_DEPTH, mode=Mode.SUBTRACT)

    # F6 (on face) → F7 (cut)
    with BuildSketch(Plane(origin=(0, 0, -33.2800959392), x_dir=(1, 0, 0), z_dir=(0, 0, -1))):
        with Locations((-26, 0)):
            Circle(F6_R)
        with Locations((26, 0)):
            Circle(F6_R)
    extrude(amount=-F7_DEPTH, mode=Mode.SUBTRACT)

    # F0 (on Front) → F8 (join, symmetric)
    with BuildSketch(Plane.XZ):
        with BuildLine():
            ThreePointArc((-19, -33.2800959392), (0, -14.2800959392), (19, -33.2800959392))
            Line((19, -33.2800959392), (21, -33.2800959392))
            ThreePointArc((21, -33.2800959392), (0, -12.2800959392), (-21, -33.2800959392))
            Line((-21, -33.2800959392), (-19, -33.2800959392))
        make_face()
    extrude(amount=F8_DEPTH, both=True)

    # F9: fillet of radius 2 on 10 edges, made by hand

    # F9_s2 → F9_t1 (join)
    with BuildSketch(Plane(origin=(0.3107945998, 0, -6.0136195165), x_dir=(0, 1, 0), z_dir=(-0.0516129032, 0, 0.9986671659))):
        with BuildLine():
            ThreePointArc((-2, -9.966328946), (-2.5857864376, -11.3805425083), (-4, -11.966328946))
            Line((-4, -11.966328946), (-2, -11.966328946))
            Line((-2, -11.966328946), (-2, -9.966328946))
        make_face()
    extrude(amount=F9_T1_DEPTH)

    # F9_s4 → F9_t3 (join)
    with BuildSketch(Plane(origin=(5.6777536953, 0, 109.85985746), x_dir=(0, 1, 0), z_dir=(-0.0516129032, 0, -0.9986671659))):
        with BuildLine():
            ThreePointArc((-2, -9.966328946), (-2.5857864376, -11.3805425083), (-4, -11.966328946))
            Line((-4, -11.966328946), (-2, -11.966328946))
            Line((-2, -11.966328946), (-2, -9.966328946))
        make_face()
    extrude(amount=F9_T3_DEPTH)

    # F9_s6 → F9_t5 (join)
    with BuildSketch(Plane(origin=(-0.3107945998, 0, -6.0136195165), x_dir=(0, 1, 0), z_dir=(0.0516129032, 0, 0.9986671659))):
        with BuildLine():
            ThreePointArc((2, 9.966328946), (2.5857864376, 11.3805425083), (4, 11.966328946))
            Line((4, 11.966328946), (2, 11.966328946))
            Line((2, 11.966328946), (2, 9.966328946))
        make_face()
    extrude(amount=F9_T5_DEPTH)

    # F9_s8 → F9_t7 (join)
    with BuildSketch(Plane(origin=(-5.6777536953, 0, 109.85985746), x_dir=(0, 1, 0), z_dir=(0.0516129032, 0, -0.9986671659))):
        with BuildLine():
            ThreePointArc((4, 11.966328946), (2.5857864376, 11.3805425083), (2, 9.966328946))
            Line((2, 9.966328946), (2, 11.966328946))
            Line((2, 11.966328946), (4, 11.966328946))
        make_face()
    extrude(amount=F9_T7_DEPTH)

    # F9_s9 → F9_t10 (revolve)
    with BuildSketch(Plane.XY.offset(-33.2800959392)):
        with BuildLine():
            ThreePointArc((21, -6.5), (21.7320508076, -5.7679491924), (22.7320508076, -5.5))
            Line((22.7320508076, -5.5), (21, -5.5))
            Line((21, -5.5), (21, -6.5))
        make_face()
    revolve(axis=Axis((0, -5.5, -33.2800959392), (0, -1, 0)), revolution_arc=F9_T10_ANGLE)

    # F9_s11 → F9_t12 (revolve)
    with BuildSketch(Plane.XY.offset(-33.2800959392)):
        with BuildLine():
            ThreePointArc((22.7320508076, 5.5), (21.7320508076, 5.7679491924), (21, 6.5))
            Line((21, 6.5), (21, 5.5))
            Line((21, 5.5), (22.7320508076, 5.5))
        make_face()
    revolve(axis=Axis((0, 5.5, -33.2800959392), (0, -1, 0)), revolution_arc=F9_T12_ANGLE)

    # F9_s13 → F9_t14 (revolve)
    with BuildSketch(Plane(origin=(-13.8734074516, 0, -7.4520252165), x_dir=(0, 1, 0), z_dir=(-0.880954947, 0, -0.4732001494))):
        with BuildLine():
            ThreePointArc((-2, -7.6817348471), (-2.5857864376, -6.2675212848), (-4, -5.6817348471))
            Line((-4, -5.6817348471), (-2, -5.6817348471))
            Line((-2, -5.6817348471), (-2, -7.6817348471))
        make_face()
    revolve(axis=Axis((0, -2, -33.2800959392), (0, 1, 0)), revolution_arc=F9_T14_ANGLE)

    # F9_s15 → F9_t16 (revolve)
    with BuildSketch(Plane(origin=(59.1951057851, 0, 46.7222997417), x_dir=(0, 1, 0), z_dir=(0.7849516283, 0, 0.6195570525))):
        with BuildLine():
            ThreePointArc((-4, 78.044236888), (-2.5857864376, 77.4584504504), (-2, 76.044236888))
            Line((-2, 76.044236888), (-2, 78.044236888))
            Line((-2, 78.044236888), (-4, 78.044236888))
        make_face()
    revolve(axis=Axis((0, -2, 121.7199040608), (0, 1, 0)), revolution_arc=F9_T16_ANGLE)

    # F9_s17 → F9_t18 (revolve)
    with BuildSketch(Plane(origin=(-59.1951057851, 0, 46.7222997417), x_dir=(0, 1, 0), z_dir=(-0.7849516283, 0, 0.6195570525))):
        with BuildLine():
            ThreePointArc((2, -76.044236888), (2.5857864376, -77.4584504504), (4, -78.044236888))
            Line((4, -78.044236888), (2, -78.044236888))
            Line((2, -78.044236888), (2, -76.044236888))
        make_face()
    revolve(axis=Axis((0, 2, 121.7199040608), (0, -1, 0)), revolution_arc=F9_T18_ANGLE)

    # F9_s19 → F9_t20 (revolve)
    with BuildSketch(Plane(origin=(13.8734074516, 0, -7.4520252165), x_dir=(0, 1, 0), z_dir=(0.880954947, 0, -0.4732001494))):
        with BuildLine():
            ThreePointArc((2, 7.6817348471), (2.5857864376, 6.2675212848), (4, 5.6817348471))
            Line((4, 5.6817348471), (2, 5.6817348471))
            Line((2, 5.6817348471), (2, 7.6817348471))
        make_face()
    revolve(axis=Axis((0, 2, -33.2800959392), (0, -1, 0)), revolution_arc=F9_T20_ANGLE)


solid = f1.part
